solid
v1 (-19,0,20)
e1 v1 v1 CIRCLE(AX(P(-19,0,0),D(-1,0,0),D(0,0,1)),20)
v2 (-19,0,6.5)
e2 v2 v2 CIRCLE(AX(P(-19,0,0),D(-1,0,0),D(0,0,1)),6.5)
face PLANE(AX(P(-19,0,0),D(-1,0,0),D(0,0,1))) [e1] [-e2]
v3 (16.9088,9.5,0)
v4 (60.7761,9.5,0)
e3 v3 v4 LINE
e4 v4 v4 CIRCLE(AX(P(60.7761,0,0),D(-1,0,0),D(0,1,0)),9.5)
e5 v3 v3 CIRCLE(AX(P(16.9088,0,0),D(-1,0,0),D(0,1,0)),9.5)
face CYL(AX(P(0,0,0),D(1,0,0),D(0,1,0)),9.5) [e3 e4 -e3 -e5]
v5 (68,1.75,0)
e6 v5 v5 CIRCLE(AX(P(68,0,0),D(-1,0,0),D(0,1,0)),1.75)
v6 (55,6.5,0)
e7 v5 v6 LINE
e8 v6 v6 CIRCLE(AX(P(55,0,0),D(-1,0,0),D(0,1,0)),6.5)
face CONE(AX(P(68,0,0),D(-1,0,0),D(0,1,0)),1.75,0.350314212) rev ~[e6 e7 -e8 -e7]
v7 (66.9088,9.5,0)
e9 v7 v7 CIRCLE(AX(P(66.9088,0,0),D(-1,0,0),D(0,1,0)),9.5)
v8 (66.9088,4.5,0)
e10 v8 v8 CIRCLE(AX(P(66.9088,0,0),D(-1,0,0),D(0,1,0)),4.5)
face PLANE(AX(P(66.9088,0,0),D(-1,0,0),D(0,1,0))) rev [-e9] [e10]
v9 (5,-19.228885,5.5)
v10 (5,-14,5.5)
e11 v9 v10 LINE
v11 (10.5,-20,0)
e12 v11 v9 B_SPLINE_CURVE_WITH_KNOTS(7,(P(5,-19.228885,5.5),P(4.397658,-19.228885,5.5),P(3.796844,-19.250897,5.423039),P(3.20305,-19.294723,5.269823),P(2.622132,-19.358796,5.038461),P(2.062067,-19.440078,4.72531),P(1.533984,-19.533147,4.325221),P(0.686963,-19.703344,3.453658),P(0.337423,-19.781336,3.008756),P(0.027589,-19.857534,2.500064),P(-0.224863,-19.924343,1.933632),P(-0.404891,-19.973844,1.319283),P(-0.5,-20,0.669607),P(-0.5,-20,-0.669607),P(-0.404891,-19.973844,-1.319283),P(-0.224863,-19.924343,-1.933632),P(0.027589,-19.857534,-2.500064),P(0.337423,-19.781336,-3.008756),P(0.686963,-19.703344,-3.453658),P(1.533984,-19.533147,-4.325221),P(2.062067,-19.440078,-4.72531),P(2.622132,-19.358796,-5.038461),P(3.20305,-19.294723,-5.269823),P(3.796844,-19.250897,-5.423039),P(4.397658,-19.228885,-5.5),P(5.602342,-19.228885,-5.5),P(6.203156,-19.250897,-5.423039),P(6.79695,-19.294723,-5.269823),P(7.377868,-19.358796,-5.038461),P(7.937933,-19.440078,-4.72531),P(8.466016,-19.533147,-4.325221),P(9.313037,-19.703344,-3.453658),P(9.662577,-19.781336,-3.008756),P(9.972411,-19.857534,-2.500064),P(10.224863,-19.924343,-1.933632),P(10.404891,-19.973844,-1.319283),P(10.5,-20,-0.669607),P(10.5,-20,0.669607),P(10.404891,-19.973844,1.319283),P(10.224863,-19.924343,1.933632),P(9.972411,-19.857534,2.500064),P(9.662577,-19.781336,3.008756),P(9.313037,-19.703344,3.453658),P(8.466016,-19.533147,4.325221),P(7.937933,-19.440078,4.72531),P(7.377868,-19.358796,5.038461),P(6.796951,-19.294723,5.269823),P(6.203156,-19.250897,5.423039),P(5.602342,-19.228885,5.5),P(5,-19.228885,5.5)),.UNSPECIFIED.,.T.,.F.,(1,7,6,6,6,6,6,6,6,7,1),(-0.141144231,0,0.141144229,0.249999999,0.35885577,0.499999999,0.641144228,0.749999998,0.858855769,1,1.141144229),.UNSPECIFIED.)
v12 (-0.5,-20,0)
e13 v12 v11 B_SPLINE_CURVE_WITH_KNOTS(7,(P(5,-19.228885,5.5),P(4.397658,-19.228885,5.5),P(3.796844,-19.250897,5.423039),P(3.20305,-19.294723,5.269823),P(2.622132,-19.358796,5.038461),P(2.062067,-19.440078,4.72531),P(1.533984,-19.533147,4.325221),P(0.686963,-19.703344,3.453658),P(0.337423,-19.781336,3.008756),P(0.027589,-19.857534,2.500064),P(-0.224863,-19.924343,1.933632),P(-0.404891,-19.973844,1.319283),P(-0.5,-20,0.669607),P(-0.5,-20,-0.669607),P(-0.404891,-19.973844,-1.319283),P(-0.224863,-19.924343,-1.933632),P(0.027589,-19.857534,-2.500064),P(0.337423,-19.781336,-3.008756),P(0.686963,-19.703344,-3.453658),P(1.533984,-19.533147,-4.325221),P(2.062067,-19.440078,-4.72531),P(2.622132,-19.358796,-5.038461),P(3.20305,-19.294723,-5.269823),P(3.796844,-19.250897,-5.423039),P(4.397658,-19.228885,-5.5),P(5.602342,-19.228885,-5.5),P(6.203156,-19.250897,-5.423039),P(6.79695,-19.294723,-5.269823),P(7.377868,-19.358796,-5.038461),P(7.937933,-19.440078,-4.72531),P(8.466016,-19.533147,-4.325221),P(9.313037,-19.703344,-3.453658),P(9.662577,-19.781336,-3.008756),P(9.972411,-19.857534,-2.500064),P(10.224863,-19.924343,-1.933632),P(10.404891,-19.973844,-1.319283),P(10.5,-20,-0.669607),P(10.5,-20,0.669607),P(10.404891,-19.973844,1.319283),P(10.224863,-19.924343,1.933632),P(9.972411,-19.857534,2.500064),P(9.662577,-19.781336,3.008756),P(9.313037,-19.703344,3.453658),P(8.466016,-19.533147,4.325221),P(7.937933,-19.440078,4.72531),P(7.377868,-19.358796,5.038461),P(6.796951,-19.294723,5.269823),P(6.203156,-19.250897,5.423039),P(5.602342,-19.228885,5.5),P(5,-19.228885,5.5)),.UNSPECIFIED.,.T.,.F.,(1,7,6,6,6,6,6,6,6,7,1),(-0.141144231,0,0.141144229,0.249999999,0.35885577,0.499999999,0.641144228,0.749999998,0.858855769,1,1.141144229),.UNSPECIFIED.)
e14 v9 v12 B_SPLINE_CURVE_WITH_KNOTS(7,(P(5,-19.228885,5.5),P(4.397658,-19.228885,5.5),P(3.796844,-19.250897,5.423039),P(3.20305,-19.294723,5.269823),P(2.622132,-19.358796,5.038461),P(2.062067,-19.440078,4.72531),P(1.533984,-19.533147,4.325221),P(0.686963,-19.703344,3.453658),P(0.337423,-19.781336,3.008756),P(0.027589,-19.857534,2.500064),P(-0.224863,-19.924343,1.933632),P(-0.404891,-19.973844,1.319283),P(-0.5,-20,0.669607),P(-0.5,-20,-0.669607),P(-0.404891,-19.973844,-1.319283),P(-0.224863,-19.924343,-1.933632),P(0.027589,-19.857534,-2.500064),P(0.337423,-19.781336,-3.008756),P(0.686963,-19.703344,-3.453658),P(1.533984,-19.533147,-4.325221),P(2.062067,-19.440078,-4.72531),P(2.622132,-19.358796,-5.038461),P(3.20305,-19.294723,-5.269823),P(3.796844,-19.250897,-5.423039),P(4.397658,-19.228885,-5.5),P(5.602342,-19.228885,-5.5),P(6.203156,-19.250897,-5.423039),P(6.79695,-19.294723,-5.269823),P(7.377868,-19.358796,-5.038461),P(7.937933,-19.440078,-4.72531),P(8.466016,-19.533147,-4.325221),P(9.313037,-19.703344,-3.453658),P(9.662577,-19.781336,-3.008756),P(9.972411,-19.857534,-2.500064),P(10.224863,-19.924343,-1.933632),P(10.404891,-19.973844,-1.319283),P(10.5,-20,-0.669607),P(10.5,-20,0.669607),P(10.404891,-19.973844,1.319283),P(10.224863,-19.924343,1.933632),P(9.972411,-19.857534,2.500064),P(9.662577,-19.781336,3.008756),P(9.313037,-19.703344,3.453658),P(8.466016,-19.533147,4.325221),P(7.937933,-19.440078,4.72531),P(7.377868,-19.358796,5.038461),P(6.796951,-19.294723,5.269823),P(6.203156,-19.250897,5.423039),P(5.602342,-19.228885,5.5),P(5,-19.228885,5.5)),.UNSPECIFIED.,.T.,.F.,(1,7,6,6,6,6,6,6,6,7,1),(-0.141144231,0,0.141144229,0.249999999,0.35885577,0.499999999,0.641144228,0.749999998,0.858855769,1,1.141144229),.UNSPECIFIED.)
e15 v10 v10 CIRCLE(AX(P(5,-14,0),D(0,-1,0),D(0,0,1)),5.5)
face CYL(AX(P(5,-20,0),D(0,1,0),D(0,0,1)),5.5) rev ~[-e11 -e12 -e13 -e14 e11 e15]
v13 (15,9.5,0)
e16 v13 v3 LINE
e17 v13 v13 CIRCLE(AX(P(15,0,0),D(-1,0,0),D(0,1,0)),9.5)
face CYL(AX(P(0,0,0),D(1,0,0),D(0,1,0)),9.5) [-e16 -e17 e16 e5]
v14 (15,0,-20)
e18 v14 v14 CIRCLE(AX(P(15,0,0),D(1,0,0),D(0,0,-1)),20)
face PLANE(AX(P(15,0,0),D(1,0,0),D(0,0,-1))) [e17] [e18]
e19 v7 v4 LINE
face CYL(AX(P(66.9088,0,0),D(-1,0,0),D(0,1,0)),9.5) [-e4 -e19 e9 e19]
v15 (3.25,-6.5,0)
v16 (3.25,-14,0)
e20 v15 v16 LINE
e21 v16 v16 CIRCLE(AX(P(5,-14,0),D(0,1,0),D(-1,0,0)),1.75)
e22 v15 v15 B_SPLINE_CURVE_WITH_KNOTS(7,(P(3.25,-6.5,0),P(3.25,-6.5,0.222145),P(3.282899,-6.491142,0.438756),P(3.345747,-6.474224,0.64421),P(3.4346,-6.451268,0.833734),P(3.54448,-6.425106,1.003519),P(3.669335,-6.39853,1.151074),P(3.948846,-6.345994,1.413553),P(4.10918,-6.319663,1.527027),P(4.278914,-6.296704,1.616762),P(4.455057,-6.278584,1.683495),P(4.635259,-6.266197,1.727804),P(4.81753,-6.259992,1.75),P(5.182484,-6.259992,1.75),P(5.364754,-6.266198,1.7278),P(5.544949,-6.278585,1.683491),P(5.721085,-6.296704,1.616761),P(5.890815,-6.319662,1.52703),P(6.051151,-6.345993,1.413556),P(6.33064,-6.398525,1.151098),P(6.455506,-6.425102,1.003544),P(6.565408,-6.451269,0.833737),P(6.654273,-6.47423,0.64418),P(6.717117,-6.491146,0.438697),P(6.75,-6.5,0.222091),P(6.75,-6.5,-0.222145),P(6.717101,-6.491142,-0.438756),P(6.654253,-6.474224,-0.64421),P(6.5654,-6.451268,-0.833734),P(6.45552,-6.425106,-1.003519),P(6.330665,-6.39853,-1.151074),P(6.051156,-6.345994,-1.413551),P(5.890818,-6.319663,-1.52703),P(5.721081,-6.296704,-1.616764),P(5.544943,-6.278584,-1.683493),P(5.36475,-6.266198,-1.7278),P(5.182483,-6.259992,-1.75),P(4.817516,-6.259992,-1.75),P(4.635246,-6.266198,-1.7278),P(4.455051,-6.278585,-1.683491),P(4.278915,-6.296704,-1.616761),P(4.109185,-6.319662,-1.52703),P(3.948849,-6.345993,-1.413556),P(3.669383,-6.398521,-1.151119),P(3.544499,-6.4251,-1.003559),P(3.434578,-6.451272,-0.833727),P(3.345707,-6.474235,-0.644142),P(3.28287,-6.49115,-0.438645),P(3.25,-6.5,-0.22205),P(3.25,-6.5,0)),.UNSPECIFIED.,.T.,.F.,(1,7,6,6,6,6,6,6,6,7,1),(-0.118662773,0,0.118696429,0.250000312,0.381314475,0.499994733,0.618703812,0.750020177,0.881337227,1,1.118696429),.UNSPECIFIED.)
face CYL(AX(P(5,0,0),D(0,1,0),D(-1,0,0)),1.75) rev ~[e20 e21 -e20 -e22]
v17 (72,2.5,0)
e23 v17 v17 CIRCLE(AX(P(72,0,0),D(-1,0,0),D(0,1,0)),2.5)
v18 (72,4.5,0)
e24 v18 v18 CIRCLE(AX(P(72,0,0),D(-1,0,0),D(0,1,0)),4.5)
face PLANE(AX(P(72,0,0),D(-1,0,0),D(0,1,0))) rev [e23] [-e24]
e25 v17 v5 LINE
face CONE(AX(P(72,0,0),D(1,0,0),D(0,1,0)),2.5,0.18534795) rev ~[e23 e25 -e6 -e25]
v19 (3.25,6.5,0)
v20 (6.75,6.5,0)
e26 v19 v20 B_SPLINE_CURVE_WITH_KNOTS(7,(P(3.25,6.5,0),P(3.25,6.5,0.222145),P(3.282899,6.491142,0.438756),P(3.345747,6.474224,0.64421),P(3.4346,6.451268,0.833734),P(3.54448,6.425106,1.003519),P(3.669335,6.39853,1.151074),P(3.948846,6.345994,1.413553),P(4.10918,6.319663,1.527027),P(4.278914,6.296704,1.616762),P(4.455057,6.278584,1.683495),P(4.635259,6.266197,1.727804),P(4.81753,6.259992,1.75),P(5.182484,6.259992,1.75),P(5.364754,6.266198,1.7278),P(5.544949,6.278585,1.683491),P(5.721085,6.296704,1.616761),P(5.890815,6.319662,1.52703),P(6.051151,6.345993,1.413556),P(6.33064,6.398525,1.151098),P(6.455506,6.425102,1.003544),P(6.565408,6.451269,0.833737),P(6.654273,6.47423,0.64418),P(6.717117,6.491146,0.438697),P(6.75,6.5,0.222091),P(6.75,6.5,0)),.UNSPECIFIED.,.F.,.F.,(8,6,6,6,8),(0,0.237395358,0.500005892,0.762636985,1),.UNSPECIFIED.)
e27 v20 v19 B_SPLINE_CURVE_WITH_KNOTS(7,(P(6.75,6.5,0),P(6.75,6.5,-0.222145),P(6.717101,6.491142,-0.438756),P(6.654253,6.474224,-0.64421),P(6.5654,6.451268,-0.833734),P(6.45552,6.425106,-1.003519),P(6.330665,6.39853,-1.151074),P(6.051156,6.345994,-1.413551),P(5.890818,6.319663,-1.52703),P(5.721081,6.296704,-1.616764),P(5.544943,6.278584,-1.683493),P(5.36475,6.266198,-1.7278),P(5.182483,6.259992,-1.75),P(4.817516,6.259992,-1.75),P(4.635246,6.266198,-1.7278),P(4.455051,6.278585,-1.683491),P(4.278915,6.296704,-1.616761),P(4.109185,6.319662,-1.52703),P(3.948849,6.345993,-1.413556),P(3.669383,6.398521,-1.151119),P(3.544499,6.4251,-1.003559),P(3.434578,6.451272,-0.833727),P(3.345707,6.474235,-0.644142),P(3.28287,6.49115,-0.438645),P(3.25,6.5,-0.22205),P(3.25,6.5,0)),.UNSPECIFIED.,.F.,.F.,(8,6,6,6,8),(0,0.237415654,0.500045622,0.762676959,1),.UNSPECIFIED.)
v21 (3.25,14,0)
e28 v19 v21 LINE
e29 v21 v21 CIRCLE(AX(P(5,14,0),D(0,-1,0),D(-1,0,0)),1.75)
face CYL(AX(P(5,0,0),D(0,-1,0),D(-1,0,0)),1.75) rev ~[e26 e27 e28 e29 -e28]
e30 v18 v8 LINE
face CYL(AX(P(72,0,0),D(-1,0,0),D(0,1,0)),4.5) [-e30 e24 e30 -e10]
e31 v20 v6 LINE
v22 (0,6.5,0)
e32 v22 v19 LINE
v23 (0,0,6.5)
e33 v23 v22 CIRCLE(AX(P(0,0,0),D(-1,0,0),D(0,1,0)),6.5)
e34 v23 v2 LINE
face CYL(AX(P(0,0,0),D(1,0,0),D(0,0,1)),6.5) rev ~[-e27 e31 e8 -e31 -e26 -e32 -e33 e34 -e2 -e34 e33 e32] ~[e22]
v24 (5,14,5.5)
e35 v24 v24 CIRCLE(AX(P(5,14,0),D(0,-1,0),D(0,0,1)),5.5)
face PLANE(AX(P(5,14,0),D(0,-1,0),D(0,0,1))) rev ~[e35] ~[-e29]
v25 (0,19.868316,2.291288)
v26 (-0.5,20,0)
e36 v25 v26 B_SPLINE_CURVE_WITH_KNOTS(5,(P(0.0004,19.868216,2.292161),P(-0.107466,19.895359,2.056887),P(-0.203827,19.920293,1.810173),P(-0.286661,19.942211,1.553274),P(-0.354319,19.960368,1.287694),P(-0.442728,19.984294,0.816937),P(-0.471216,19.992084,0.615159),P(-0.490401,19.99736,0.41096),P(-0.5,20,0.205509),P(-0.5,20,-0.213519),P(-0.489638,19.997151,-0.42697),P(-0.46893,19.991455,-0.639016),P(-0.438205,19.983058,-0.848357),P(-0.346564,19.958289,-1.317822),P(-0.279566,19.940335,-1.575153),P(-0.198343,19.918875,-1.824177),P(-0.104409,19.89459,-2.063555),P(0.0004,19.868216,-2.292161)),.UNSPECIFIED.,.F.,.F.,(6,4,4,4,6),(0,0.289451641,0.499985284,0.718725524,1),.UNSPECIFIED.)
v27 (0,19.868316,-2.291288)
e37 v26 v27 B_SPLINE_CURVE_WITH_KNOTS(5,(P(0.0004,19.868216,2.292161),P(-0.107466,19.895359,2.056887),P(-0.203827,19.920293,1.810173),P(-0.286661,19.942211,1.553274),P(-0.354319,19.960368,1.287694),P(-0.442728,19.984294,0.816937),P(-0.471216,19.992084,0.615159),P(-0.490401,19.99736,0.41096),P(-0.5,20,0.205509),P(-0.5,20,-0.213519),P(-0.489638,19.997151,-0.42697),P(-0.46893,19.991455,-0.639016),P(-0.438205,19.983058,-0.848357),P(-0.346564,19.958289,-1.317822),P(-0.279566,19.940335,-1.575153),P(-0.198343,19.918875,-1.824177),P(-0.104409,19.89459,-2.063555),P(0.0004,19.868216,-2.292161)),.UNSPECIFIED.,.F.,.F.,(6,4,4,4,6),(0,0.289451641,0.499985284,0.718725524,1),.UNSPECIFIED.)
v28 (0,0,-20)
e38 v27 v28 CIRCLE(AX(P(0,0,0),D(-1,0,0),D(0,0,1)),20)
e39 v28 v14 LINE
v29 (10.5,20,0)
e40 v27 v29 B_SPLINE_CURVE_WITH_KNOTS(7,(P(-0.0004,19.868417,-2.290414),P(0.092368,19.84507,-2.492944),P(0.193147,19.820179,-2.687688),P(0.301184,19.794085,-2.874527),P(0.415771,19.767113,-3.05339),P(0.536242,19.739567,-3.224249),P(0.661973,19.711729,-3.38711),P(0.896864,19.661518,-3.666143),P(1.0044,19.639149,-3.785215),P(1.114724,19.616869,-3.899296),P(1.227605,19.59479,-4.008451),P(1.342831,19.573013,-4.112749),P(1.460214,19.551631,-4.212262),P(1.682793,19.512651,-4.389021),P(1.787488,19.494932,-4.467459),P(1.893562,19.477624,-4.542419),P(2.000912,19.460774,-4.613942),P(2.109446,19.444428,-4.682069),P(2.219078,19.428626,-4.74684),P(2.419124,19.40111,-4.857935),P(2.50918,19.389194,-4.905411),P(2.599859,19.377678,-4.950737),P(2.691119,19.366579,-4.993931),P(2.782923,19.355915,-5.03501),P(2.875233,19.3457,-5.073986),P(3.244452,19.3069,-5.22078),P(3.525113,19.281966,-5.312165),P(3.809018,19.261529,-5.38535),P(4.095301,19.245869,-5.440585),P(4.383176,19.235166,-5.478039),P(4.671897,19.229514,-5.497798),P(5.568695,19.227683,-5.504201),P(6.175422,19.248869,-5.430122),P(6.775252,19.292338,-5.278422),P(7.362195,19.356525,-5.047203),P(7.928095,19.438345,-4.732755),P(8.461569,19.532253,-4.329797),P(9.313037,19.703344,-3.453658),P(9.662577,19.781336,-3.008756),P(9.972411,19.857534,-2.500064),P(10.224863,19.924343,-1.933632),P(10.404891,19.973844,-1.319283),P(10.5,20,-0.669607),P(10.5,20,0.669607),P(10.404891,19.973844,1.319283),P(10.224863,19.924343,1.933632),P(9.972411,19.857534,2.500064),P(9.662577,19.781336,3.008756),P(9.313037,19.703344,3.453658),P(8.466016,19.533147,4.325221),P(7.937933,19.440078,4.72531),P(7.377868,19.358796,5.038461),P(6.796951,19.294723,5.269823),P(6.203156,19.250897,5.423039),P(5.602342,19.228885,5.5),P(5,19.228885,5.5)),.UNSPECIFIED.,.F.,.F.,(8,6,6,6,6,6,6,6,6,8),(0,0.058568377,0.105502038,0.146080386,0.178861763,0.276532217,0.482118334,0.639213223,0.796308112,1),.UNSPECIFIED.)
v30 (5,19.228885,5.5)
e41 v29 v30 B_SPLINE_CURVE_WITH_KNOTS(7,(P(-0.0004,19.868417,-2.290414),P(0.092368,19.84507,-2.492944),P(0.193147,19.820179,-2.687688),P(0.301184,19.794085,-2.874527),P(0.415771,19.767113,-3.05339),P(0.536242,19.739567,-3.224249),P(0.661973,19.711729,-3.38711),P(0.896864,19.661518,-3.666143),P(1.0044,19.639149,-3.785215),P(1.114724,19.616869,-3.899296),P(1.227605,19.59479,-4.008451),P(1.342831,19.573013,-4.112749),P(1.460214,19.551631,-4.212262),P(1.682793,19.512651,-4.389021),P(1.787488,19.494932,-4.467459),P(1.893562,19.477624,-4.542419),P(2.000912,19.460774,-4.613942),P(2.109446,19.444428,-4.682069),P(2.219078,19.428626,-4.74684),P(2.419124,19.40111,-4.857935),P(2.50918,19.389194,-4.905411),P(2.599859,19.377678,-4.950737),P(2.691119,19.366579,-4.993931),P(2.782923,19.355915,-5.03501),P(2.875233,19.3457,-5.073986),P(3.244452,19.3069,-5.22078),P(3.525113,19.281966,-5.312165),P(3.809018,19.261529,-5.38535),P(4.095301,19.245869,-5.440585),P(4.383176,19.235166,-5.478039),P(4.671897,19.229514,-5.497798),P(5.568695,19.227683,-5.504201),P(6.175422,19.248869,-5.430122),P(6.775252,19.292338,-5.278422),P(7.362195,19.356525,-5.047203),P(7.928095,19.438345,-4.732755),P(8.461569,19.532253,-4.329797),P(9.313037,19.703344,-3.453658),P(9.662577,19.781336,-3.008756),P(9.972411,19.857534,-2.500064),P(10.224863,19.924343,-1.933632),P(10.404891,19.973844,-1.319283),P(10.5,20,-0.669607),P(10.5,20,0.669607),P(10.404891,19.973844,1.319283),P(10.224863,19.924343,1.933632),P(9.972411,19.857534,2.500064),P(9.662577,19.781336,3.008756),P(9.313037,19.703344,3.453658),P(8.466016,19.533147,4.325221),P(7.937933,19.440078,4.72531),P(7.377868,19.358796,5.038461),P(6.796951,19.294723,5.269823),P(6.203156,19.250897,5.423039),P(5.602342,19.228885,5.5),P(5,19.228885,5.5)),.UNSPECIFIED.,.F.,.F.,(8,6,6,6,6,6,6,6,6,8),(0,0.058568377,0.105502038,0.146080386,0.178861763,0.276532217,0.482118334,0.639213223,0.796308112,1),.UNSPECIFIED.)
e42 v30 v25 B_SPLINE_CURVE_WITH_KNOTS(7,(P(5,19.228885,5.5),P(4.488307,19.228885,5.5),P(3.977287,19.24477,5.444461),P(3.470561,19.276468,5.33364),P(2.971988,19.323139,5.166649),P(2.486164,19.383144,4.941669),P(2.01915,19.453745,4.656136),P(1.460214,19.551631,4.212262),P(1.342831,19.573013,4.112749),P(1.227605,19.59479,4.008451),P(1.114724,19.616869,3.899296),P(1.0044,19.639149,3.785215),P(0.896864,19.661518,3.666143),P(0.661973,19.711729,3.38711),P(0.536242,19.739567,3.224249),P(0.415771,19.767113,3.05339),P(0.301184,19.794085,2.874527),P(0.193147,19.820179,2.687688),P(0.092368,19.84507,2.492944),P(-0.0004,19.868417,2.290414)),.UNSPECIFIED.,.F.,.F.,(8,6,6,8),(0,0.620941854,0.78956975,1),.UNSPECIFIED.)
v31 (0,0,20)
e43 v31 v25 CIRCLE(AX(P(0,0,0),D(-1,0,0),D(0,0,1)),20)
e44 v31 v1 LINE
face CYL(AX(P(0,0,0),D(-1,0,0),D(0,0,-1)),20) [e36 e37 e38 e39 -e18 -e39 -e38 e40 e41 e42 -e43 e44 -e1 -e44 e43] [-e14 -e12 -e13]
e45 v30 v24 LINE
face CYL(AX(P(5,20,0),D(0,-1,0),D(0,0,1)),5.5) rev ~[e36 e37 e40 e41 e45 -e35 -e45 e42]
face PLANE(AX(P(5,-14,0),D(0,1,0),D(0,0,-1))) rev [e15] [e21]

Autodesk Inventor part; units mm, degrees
ref_plane "YZ Plane" through (0, 0, 0) normal (1, 0, 0) x (0, 1, 0)
sketch "Sketch1" plane through (0, 0, 0) normal (0, 0, 1) x (1, 0, 0)
  line L0 (0, 0) -> (0, 6.5)
  line L1 (0, 6.5) -> (55, 6.5)
  line L2 (68, 1.75) -> (55, 6.5)
  line L3 (72, 0) -> (72, 2.5)
  line L4 (72, 2.5) -> (68, 1.75)
  line L5 (0, 6.5) -> (0, 9.5)
  line L6 (0, 9.5) -> (60.7761, 9.5)
  line L7 (72, 0) -> (0, 0)
  line L8 (72, 2.5) -> (72, 4.5)
  line L9 (72, 4.5) -> (66.9088, 4.5)
  line L10 (66.9088, 4.5) -> (66.9088, 9.5)
  line L11 (66.9088, 9.5) -> (60.7761, 9.5)
  line L12 (66.9088, 9.5) -> (66.9088, 9.5)
  line L13 (66.9088, 9.5) -> (16.9088, 9.5)
  line L14 (16.9088, 9.5) -> (16.9088, 9.5)
  point P0 (72, 1.25)
  dimension "d0" = 6.5
  dimension "d1" = 55
  dimension "d5" = 2.5
  dimension "d6" = 3
  dimension "d7" = 0
  dimension "d8" = 50
  dimension "d44" = 1.75
  dimension "d45" = 4
  dimension "d46" = 13
revolve "Revolution1" add sketch "Sketch1" angle 360 about axis through (72, 0, 0) along (-1, 0, 0) contours L5 L6 L11 L10 L9 L8 L4 L2 L1
sketch "Sketch2" plane through (0, 0, 0) normal (-1, 0, 0) x (0, 0, 1)
  circle A0 centre (0, 0) radius 2.5 projected
  circle A1 centre (0, 0) radius 20
  circle A2 centre (0, 0) radius 6.5
  dimension "d10" = 40
  dimension "d11" = 13
extrude "Extrusion1" add sketch "Sketch2" along normal blind 19 contours A1
sketch "Sketch3" plane through (0, 0, 0) normal (1, 0, 0) x (0, 0, -1)
  circle A0 centre (0, 0) radius 1.75 projected
  circle A1 centre (0, 0) radius 20
  circle A2 centre (0, 0) radius 4.5 projected
  circle A3 centre (0, 0) radius 9.5
  dimension "d18" = 40
  dimension "d37" = 19
extrude "Extrusion2" add sketch "Sketch3" along normal blind 15 contours A1
sketch "Sketch4" plane through (0, 0, 0) normal (0, 1, 0) x (-1, 0, 0)
  line L0 (19, -20) -> (19, 20) projected
  line L1 (19, 0) -> (-5, 0)
  circle A0 centre (-5, 0) radius 1.75
  point P0 (0, 0)
  dimension "d21" = 24
  dimension "d22" = 3.5
extrude "Extrusion3" cut sketch "Sketch4" along normal through all both and the other way through all
ref_plane "Work Plane1" through (0, 20, 0) normal (0, 1, 0) x (-1, 0, 0)
sketch "Sketch5" plane through (0, 20, 0) normal (0, 1, 0) x (-1, 0, 0)
  line L0 (19, -20) -> (19, 20) projected
  line L1 (19, 0) -> (-5, 0)
  circle A0 centre (-5, 0) radius 3.175
  point P0 (0, 0)
  dimension "d26" = 24
  dimension "d27" = 6.35
hole "Hole1" at (5, 20, 0) direction (0, -1, 0) diameter 2 end through all counterbore diameter 11 counterbore depth 6
thread "Thread3" size "Rc 1/4" standard "BSP Taper Internal" length 11
mirror "Mirror1" about plane through (0, 0, 0) normal (0, 1, 0) of "Hole1"
thread "Thread4" size "M14x1.25" class "6H" standard "ANSI Metric M Profile" length 19
ref_plane "Work Plane3" through (0, 0, 0) normal (-1, 0, 0) x (0, 0, 1)
ref_plane "Work Plane2" through (0, 0, 0) normal (0, 1, 0) x (-1, 0, 0)
properties part number "ASI Propane" material "Stainless Steel"
